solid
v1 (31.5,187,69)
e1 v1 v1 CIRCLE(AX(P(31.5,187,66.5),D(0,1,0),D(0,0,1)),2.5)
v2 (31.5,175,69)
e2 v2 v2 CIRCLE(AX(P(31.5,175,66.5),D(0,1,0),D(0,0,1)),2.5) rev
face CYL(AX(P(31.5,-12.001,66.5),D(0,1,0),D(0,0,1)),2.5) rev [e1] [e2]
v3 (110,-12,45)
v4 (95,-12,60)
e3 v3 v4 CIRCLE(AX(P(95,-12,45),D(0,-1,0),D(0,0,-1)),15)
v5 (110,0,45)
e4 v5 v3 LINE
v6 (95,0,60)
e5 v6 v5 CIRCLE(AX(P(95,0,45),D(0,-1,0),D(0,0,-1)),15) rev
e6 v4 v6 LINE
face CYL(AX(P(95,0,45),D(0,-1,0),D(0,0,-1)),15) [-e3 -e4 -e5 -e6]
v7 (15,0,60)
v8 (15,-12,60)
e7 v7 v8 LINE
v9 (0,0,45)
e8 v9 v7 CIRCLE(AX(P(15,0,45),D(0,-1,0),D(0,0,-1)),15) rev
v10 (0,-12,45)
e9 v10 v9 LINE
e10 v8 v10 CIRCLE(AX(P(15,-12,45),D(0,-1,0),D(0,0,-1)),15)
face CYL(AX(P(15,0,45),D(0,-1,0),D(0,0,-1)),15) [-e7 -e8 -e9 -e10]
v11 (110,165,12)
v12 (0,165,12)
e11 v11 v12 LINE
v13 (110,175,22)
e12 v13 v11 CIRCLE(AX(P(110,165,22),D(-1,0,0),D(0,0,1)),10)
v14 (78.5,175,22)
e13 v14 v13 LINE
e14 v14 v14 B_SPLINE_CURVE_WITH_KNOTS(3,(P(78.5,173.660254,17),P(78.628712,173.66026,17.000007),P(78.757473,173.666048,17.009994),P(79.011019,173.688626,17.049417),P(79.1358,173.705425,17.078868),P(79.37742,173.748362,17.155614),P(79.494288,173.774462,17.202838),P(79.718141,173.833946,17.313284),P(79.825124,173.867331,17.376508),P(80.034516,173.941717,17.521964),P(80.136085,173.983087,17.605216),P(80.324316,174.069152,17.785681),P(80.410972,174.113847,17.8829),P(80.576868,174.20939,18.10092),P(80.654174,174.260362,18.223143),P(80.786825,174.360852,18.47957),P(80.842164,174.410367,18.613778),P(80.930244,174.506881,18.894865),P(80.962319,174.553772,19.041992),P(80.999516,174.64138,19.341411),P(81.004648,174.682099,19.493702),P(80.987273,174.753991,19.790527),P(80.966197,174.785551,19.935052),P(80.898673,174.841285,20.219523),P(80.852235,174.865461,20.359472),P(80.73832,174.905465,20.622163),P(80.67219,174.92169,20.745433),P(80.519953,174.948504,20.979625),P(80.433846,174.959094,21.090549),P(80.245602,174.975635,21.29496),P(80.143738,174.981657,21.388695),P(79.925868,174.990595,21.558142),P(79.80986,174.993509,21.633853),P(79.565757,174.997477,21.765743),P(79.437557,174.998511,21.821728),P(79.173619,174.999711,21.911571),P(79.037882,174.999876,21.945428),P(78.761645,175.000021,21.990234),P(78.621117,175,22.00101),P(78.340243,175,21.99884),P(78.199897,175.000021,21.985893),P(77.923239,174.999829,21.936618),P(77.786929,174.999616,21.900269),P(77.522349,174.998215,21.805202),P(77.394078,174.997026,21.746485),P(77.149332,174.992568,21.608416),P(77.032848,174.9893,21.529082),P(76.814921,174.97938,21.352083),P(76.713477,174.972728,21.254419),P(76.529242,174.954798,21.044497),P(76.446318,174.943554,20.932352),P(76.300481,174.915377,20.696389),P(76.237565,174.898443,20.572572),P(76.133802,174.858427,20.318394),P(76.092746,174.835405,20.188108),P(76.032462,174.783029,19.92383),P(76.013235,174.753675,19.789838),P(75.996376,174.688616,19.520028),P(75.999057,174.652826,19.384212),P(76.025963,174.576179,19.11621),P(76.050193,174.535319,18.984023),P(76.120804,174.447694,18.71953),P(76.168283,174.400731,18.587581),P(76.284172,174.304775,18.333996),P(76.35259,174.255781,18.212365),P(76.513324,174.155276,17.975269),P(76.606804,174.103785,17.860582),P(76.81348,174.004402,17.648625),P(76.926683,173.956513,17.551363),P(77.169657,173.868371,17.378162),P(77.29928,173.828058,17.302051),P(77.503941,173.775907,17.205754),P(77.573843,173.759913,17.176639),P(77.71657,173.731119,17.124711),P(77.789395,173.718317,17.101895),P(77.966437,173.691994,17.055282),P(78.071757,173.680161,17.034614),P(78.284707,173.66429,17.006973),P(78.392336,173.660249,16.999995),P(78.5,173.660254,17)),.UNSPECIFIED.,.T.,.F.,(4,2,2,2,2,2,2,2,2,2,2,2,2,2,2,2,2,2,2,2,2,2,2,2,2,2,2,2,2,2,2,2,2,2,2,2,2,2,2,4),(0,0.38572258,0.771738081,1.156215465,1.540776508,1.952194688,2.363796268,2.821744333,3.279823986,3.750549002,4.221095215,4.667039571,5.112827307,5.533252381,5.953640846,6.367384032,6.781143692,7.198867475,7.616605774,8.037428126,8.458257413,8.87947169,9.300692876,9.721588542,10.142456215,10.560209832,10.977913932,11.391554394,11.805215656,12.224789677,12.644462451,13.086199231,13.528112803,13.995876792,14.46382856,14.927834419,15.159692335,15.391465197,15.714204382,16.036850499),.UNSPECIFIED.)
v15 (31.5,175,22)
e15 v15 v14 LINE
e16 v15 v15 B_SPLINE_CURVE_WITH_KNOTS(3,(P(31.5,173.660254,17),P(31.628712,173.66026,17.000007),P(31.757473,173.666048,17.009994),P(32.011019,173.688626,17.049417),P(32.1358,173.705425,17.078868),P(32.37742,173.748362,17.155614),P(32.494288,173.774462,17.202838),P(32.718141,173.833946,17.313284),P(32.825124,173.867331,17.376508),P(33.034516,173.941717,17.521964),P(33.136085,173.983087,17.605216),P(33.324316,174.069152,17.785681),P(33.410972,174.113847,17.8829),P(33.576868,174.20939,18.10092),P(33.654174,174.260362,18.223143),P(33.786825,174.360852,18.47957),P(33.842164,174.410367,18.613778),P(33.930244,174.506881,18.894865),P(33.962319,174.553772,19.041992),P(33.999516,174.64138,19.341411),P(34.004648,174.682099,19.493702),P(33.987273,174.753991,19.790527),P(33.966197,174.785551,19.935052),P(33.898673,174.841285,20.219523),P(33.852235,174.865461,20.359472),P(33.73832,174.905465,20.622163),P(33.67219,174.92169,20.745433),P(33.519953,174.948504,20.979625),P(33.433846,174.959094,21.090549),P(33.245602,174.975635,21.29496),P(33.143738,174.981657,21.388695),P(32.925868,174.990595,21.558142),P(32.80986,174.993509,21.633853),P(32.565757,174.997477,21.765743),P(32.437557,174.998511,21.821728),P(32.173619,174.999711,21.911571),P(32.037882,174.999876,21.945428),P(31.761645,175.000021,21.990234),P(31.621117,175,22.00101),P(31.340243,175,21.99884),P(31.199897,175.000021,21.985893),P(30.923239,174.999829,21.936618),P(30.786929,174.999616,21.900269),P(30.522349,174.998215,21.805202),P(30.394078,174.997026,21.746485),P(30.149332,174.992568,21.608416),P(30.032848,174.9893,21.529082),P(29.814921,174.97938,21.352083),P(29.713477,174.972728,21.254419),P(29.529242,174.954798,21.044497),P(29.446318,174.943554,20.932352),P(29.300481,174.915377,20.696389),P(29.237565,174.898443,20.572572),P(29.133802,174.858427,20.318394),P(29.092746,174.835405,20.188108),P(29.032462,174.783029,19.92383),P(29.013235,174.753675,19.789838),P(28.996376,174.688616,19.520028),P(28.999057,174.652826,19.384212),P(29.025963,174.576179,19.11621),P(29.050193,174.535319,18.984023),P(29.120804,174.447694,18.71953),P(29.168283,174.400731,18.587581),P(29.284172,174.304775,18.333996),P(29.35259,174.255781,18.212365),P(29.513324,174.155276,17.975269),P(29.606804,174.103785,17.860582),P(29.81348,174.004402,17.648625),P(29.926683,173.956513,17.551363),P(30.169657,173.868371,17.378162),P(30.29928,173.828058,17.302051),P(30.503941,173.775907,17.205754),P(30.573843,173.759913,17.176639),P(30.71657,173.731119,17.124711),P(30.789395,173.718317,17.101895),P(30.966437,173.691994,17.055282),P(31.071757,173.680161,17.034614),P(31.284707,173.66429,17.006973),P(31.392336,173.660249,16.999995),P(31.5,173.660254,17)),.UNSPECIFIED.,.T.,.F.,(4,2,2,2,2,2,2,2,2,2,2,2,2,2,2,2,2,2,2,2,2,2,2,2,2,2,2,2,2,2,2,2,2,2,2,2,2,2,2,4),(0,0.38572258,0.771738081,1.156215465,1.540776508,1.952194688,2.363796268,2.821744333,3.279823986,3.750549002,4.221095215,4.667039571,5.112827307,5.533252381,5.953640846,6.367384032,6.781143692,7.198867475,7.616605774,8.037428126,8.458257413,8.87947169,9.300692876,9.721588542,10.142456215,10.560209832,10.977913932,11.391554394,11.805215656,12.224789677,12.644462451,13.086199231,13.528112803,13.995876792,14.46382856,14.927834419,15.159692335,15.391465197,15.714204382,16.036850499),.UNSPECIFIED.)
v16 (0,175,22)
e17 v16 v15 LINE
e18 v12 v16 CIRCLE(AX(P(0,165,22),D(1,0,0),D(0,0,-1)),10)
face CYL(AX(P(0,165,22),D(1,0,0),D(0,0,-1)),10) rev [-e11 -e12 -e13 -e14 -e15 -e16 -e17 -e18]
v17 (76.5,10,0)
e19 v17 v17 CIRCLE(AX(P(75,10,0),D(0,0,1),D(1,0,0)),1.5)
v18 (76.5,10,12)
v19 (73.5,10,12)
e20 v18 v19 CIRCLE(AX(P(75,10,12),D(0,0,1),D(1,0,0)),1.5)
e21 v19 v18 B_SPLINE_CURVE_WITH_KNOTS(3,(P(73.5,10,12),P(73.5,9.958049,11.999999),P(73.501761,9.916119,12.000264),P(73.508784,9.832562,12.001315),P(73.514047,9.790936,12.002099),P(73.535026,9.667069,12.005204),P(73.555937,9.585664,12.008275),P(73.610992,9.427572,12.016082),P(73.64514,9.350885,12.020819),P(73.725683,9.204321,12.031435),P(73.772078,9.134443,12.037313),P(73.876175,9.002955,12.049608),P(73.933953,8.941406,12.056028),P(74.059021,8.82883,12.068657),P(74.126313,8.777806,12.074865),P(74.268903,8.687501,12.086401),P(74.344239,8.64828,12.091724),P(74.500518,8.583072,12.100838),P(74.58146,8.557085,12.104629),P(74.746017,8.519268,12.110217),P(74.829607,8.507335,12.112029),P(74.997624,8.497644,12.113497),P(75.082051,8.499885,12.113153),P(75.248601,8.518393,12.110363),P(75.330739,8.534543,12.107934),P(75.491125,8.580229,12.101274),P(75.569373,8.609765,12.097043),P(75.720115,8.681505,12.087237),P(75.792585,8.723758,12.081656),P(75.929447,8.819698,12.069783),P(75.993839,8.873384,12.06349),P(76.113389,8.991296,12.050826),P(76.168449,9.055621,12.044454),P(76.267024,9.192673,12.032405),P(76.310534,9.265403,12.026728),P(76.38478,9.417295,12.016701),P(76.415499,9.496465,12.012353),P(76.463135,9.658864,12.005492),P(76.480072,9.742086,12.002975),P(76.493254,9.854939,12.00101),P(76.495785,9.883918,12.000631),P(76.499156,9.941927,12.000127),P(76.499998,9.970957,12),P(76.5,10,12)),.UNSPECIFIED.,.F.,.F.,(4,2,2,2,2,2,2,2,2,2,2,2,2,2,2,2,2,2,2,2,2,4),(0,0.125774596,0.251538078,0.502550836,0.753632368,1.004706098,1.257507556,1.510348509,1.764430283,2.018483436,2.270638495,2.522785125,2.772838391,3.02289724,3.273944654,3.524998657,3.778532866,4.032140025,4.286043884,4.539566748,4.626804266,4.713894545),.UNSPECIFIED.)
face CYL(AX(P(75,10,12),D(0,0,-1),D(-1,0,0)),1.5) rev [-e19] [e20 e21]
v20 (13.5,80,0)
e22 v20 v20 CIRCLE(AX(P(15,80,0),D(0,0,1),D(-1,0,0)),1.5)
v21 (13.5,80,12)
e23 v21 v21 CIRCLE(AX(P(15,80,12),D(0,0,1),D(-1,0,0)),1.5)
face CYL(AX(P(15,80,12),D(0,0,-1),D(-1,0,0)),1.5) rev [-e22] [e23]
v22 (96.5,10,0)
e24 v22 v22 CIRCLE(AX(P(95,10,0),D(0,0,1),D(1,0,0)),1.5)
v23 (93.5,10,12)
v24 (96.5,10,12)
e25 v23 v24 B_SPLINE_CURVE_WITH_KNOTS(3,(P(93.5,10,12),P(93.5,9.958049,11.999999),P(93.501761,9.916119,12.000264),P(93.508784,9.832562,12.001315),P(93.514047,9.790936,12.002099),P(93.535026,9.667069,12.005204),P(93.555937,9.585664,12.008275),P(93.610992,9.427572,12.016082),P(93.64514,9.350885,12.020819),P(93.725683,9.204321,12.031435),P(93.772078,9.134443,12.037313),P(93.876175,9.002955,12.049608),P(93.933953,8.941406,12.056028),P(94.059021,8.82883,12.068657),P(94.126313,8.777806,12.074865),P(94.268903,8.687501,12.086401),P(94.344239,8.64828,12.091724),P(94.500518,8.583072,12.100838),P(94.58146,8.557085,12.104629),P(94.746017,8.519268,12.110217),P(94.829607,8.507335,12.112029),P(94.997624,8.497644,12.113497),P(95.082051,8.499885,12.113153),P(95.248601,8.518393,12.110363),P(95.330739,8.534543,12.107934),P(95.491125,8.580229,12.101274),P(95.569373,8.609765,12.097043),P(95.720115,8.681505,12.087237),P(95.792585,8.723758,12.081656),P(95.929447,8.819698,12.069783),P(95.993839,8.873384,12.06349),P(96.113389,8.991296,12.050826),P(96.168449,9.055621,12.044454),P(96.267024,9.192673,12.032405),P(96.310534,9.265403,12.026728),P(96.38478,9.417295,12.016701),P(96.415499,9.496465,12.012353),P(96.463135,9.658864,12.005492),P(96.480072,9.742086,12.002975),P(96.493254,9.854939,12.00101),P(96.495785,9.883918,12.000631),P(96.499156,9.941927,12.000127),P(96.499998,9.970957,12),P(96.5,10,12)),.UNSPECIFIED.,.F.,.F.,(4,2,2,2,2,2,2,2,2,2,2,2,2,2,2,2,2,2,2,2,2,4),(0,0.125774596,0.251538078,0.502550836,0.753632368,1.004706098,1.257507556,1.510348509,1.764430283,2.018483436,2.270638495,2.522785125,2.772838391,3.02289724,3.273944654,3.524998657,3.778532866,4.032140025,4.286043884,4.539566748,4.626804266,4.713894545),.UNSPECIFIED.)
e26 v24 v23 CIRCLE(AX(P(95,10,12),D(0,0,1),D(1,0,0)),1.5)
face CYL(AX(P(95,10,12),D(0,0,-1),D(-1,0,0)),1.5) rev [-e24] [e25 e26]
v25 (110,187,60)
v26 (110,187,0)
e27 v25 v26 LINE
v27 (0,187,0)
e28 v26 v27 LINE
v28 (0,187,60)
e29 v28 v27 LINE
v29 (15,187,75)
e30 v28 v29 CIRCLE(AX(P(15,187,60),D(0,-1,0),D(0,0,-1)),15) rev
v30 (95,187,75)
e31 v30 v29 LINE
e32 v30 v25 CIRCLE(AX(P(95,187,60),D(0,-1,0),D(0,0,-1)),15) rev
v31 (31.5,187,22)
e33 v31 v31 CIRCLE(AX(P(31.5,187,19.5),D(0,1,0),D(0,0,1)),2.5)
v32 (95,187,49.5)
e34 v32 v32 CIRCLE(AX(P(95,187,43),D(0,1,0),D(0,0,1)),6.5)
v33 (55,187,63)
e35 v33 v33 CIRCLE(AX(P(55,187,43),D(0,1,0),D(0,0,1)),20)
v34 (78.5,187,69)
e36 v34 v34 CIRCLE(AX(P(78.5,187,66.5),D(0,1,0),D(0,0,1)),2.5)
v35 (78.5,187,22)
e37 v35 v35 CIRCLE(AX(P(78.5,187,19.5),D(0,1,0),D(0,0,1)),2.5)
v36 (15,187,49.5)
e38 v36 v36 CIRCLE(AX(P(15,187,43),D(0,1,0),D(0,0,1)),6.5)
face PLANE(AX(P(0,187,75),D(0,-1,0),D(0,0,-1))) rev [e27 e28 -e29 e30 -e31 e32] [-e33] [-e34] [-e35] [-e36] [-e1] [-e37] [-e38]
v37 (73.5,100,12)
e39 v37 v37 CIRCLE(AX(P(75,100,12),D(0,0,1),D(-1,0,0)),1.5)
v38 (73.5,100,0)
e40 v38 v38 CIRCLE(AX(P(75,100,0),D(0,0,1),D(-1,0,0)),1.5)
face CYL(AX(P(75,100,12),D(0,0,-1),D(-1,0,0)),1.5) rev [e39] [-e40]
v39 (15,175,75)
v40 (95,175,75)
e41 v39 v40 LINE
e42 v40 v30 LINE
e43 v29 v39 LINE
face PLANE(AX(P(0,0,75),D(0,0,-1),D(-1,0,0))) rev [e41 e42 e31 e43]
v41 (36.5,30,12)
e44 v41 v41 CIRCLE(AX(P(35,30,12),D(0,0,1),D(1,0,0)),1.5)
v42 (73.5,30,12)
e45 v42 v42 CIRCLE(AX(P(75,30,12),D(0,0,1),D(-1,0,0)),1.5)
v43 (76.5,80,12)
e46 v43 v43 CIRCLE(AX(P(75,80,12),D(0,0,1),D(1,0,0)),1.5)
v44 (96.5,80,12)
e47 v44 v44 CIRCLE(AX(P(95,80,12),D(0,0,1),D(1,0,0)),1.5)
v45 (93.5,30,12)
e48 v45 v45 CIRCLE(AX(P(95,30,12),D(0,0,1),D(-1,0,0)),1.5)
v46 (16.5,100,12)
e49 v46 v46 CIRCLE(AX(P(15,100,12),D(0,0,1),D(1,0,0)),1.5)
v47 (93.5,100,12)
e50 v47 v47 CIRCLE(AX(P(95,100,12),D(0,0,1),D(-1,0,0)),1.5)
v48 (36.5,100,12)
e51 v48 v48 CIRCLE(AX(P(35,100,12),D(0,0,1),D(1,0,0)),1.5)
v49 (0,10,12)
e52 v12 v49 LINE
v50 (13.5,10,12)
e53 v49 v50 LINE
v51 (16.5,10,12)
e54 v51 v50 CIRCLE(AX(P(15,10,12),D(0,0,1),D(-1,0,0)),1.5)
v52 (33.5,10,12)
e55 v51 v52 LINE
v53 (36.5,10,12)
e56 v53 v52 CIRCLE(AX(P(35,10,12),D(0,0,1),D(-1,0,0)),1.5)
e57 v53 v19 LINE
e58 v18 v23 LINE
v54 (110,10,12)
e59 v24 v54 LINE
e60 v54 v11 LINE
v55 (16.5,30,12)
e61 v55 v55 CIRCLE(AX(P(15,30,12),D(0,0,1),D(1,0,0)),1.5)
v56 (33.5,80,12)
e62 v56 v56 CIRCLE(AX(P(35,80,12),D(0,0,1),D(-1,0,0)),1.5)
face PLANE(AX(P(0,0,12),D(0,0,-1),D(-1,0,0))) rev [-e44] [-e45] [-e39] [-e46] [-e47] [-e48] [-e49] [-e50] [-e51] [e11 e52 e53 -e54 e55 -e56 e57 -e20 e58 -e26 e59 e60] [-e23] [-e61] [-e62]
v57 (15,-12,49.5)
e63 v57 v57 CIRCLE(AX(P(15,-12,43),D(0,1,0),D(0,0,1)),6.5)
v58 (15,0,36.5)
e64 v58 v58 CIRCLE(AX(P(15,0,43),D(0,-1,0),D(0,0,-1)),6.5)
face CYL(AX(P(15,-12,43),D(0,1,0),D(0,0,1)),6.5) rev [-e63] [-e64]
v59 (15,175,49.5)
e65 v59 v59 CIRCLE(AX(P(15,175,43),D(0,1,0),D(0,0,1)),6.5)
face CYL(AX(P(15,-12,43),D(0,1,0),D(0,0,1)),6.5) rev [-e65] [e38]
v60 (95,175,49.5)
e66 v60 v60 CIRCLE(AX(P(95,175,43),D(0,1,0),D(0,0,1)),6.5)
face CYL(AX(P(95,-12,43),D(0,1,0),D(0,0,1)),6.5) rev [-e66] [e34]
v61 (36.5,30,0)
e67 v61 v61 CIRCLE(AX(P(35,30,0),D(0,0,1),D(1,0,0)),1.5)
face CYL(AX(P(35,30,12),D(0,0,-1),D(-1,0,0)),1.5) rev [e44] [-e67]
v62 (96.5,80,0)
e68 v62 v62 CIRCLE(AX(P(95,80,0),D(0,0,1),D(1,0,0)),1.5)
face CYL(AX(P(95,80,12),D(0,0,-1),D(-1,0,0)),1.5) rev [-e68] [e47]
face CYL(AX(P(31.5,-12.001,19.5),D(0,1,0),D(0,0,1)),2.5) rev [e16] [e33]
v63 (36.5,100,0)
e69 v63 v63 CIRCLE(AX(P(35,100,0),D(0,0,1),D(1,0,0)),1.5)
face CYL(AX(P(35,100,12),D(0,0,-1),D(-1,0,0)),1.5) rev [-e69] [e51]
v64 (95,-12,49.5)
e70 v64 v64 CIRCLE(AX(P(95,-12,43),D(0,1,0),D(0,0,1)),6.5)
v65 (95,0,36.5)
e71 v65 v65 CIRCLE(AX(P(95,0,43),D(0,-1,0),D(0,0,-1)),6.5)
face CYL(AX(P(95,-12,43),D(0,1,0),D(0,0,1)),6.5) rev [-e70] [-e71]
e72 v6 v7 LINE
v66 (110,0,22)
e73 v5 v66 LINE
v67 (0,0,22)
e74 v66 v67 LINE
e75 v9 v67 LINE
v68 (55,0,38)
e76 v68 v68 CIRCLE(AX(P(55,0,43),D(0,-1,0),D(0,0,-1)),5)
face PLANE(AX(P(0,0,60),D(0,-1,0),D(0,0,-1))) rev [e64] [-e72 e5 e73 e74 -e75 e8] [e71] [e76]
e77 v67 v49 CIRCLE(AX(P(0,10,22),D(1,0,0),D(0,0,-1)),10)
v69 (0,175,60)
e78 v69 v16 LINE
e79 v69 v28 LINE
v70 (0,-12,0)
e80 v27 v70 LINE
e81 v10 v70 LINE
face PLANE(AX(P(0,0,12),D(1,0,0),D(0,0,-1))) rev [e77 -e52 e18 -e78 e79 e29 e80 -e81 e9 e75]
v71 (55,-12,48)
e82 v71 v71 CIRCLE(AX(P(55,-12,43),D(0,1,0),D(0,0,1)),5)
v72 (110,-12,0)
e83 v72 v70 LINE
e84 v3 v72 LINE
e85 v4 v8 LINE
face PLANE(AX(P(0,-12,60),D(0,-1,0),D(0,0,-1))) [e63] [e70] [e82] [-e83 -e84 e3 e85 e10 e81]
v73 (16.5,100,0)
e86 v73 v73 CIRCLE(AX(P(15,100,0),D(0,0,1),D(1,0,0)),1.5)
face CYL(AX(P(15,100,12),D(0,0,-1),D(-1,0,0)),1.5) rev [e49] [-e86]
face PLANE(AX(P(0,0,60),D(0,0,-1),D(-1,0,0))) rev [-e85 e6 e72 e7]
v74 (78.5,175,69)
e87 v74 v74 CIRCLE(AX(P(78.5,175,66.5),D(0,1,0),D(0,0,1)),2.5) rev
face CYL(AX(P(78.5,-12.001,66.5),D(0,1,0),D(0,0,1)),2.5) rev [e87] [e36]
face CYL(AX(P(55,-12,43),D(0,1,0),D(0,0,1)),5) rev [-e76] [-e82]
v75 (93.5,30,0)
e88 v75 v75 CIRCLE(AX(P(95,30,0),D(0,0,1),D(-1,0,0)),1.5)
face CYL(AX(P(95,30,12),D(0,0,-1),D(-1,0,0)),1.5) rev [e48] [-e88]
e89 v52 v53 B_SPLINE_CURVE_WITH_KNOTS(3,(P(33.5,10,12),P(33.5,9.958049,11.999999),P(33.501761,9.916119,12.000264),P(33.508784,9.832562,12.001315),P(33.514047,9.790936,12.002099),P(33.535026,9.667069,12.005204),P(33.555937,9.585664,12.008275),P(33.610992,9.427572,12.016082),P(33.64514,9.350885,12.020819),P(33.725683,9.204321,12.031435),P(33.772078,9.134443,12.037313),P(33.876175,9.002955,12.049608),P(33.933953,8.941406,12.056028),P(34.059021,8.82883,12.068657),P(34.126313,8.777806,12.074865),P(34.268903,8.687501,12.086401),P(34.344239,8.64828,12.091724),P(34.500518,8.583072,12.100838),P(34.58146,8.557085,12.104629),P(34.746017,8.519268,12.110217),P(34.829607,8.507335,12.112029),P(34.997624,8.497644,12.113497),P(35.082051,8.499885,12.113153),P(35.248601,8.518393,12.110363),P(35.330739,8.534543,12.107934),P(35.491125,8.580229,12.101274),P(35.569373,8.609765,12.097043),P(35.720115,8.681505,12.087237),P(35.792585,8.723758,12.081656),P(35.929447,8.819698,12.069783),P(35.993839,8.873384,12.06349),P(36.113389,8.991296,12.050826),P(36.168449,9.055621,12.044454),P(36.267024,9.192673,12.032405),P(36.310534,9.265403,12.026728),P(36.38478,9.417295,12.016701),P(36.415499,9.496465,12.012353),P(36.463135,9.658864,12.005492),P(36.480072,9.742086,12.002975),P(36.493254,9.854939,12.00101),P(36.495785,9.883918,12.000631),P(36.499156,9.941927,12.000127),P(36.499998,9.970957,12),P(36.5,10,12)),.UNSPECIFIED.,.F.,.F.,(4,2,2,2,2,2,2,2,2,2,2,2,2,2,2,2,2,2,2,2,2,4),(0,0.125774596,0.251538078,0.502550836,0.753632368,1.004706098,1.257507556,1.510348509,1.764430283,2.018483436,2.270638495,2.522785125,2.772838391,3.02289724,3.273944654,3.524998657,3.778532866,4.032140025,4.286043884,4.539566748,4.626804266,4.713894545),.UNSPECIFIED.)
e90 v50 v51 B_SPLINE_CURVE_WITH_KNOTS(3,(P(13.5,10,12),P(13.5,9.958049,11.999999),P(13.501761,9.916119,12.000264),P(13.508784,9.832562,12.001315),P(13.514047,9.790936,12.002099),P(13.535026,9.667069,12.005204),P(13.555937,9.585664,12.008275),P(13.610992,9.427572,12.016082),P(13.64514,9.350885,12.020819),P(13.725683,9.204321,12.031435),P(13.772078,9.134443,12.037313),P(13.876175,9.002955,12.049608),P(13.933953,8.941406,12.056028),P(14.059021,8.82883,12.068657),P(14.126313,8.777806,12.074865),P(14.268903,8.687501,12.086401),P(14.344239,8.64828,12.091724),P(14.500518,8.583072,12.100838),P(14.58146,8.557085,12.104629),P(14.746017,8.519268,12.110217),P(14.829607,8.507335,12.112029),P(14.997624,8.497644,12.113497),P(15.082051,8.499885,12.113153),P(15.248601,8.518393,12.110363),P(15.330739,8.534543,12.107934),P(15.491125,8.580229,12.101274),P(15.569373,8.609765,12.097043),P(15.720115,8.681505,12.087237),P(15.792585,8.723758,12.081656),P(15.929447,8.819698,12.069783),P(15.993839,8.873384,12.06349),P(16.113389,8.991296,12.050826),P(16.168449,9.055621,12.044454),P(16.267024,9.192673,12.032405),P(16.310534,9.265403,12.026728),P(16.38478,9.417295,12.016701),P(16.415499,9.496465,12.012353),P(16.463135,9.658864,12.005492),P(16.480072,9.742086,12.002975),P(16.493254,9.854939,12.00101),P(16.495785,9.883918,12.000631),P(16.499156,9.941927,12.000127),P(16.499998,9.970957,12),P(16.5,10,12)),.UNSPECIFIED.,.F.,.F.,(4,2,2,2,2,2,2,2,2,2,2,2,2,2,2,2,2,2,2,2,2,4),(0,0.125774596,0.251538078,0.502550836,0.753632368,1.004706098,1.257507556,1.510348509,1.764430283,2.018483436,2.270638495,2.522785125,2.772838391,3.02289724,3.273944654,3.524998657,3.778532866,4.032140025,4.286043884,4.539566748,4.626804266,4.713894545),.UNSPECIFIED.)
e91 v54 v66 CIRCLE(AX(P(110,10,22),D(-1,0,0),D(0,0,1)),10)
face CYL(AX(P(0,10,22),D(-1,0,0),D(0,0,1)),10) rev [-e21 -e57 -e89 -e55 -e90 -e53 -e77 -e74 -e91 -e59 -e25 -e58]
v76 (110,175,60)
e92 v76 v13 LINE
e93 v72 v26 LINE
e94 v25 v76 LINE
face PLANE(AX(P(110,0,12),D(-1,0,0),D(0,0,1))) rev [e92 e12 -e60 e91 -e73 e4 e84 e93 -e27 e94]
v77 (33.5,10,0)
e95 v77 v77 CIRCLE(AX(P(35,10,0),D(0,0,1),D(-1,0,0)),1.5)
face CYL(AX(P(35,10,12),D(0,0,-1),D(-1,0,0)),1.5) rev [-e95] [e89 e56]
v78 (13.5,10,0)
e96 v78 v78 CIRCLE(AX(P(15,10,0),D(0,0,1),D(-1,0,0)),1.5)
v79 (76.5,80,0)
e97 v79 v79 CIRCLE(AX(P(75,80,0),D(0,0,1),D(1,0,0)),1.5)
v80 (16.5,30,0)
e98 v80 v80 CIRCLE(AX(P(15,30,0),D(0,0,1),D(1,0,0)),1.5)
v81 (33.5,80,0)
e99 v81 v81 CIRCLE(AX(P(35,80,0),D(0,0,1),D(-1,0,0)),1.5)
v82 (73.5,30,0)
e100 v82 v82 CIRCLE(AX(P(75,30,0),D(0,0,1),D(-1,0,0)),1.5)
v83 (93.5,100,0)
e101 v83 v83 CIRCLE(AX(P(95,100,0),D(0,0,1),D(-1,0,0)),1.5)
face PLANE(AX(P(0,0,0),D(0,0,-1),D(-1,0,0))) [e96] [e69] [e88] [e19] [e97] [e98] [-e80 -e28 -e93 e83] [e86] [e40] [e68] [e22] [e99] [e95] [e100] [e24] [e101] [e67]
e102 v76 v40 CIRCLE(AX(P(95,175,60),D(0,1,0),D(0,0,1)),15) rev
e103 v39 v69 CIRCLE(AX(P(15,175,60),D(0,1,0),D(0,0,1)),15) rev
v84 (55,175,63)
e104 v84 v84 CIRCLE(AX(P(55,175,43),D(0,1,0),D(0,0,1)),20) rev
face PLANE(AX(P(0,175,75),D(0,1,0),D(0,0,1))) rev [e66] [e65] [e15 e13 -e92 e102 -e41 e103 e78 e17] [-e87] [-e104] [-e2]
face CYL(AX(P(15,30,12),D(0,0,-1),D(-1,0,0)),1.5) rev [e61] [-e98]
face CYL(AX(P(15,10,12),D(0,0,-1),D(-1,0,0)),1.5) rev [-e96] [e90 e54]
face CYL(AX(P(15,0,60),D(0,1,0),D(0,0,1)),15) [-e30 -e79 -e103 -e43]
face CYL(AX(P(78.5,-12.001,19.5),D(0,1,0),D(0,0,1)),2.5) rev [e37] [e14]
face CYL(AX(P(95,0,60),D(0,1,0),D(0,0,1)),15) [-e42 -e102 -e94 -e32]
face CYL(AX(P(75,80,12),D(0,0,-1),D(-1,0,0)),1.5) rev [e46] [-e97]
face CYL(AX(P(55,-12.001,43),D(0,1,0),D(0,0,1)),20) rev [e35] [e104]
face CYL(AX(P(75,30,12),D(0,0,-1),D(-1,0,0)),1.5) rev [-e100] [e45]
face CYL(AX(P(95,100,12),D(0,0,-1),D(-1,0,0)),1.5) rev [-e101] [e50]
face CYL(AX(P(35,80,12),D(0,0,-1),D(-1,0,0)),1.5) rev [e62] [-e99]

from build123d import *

# Parameters (mm, degrees)
SKETCH1_W           = 110
SKETCH1_H           = 175
SKETCH1_R           = 1.5
BOSS_EXTRUDE1_DEPTH = 12
SKETCH2_W           = 110
SKETCH2_H           = 12
BOSS_EXTRUDE2_DEPTH = 75
SKETCH2_3_W         = 110
SKETCH2_3_H         = 12
BOSS_EXTRUDE3_DEPTH = 60
SKETCH3_R           = 6.5
CUT_EXTRUDE1_DEPTH  = 240.428486192
CUT_EXTRUDE2_REACH  = 241.428
SKETCH3_3_R         = 2.5
SKETCH3_3_R_2       = 20
SKETCH3_4_R         = 5
CUT_EXTRUDE3_DEPTH  = 240.428486192
FILLET1_R           = 10
FILLET2_R           = 15


with BuildPart() as part:
    # Sketch1 → Boss-Extrude1 (new body)
    with BuildSketch(Plane.XY):
        with Locations((55, 87.5)):
            Rectangle(SKETCH1_W, SKETCH1_H)
        with Locations((95, 10)):
            Circle(SKETCH1_R, mode=Mode.SUBTRACT)
        with Locations((75, 10)):
            Circle(SKETCH1_R, mode=Mode.SUBTRACT)
        with Locations(Location((95, 30, 0), (0, 0, 180))):
            Circle(SKETCH1_R, mode=Mode.SUBTRACT)
        with Locations(Location((75, 30, 0), (0, 0, 180))):
            Circle(SKETCH1_R, mode=Mode.SUBTRACT)
        with Locations(Location((35, 10, 0), (0, 0, 180))):
            Circle(SKETCH1_R, mode=Mode.SUBTRACT)
        with Locations(Location((15, 10, 0), (0, 0, 180))):
            Circle(SKETCH1_R, mode=Mode.SUBTRACT)
        with Locations((15, 30)):
            Circle(SKETCH1_R, mode=Mode.SUBTRACT)
        with Locations((35, 30)):
            Circle(SKETCH1_R, mode=Mode.SUBTRACT)
        with Locations(Location((95, 100, 0), (0, 0, 180))):
            Circle(SKETCH1_R, mode=Mode.SUBTRACT)
        with Locations((95, 80)):
            Circle(SKETCH1_R, mode=Mode.SUBTRACT)
        with Locations((75, 80)):
            Circle(SKETCH1_R, mode=Mode.SUBTRACT)
        with Locations(Location((75, 100, 0), (0, 0, 180))):
            Circle(SKETCH1_R, mode=Mode.SUBTRACT)
        with Locations((35, 100)):
            Circle(SKETCH1_R, mode=Mode.SUBTRACT)
        with Locations((15, 100)):
            Circle(SKETCH1_R, mode=Mode.SUBTRACT)
        with Locations(Location((35, 80, 0), (0, 0, 180))):
            Circle(SKETCH1_R, mode=Mode.SUBTRACT)
        with Locations(Location((15, 80, 0), (0, 0, 180))):
            Circle(SKETCH1_R, mode=Mode.SUBTRACT)
    extrude(amount=BOSS_EXTRUDE1_DEPTH)

    # Sketch2 → Boss-Extrude2 (add)
    with BuildSketch(Plane(origin=(0, 0, 0), x_dir=(-1, 0, 0), z_dir=(0, 0, -1))):
        with Locations((-55, 181)):
            Rectangle(SKETCH2_W, SKETCH2_H)
    extrude(amount=-BOSS_EXTRUDE2_DEPTH)

    # Sketch2<3> → Boss-Extrude3 (add)
    with BuildSketch(Plane(origin=(0, 0, 0), x_dir=(-1, 0, 0), z_dir=(0, 0, -1))):
        with Locations((-55, -6)):
            Rectangle(SKETCH2_3_W, SKETCH2_3_H)
    extrude(amount=-BOSS_EXTRUDE3_DEPTH)

    # Sketch3 → Cut-Extrude1 (cut, through all)
    with BuildSketch(Plane(origin=(0, 187, 0), x_dir=(1, 0, 0), z_dir=(0, 1, 0))):
        with Locations(Location((15, -43, 0), (0, 0, 270))):
            Circle(SKETCH3_R)
        with Locations(Location((95, -43, 0), (0, 0, 270))):
            Circle(SKETCH3_R)
    extrude(amount=-CUT_EXTRUDE1_DEPTH, mode=Mode.SUBTRACT)

    # Sketch3<3> → Cut-Extrude2 (cut, up to next)
    with BuildSketch(Plane(origin=(0, 187, 0), x_dir=(1, 0, 0), z_dir=(0, 1, 0)), mode=Mode.PRIVATE) as cut_extrude2_sk1:
        with Locations(Location((31.5, -19.5, 0), (0, 0, 270))):
            Circle(SKETCH3_3_R)
    cut_extrude2_tool1 = extrude(cut_extrude2_sk1.sketch, amount=-CUT_EXTRUDE2_REACH, mode=Mode.PRIVATE) & part.part
    # Sketch3<3> → Cut-Extrude2 (cut, up to next)
    with BuildSketch(Plane(origin=(0, 187, 0), x_dir=(1, 0, 0), z_dir=(0, 1, 0)), mode=Mode.PRIVATE) as cut_extrude2_sk2:
        with Locations(Location((78.5, -19.5, 0), (0, 0, 270))):
            Circle(SKETCH3_3_R)
    cut_extrude2_tool2 = extrude(cut_extrude2_sk2.sketch, amount=-CUT_EXTRUDE2_REACH, mode=Mode.PRIVATE) & part.part
    # Sketch3<3> → Cut-Extrude2 (cut, up to next)
    with BuildSketch(Plane(origin=(0, 187, 0), x_dir=(1, 0, 0), z_dir=(0, 1, 0)), mode=Mode.PRIVATE) as cut_extrude2_sk3:
        with Locations(Location((31.5, -66.5, 0), (0, 0, 270))):
            Circle(SKETCH3_3_R)
    cut_extrude2_tool3 = extrude(cut_extrude2_sk3.sketch, amount=-CUT_EXTRUDE2_REACH, mode=Mode.PRIVATE) & part.part
    # Sketch3<3> → Cut-Extrude2 (cut, up to next)
    with BuildSketch(Plane(origin=(0, 187, 0), x_dir=(1, 0, 0), z_dir=(0, 1, 0)), mode=Mode.PRIVATE) as cut_extrude2_sk4:
        with Locations(Location((78.5, -66.5, 0), (0, 0, 270))):
            Circle(SKETCH3_3_R)
    cut_extrude2_tool4 = extrude(cut_extrude2_sk4.sketch, amount=-CUT_EXTRUDE2_REACH, mode=Mode.PRIVATE) & part.part
    # Sketch3<3> → Cut-Extrude2 (cut, up to next)
    with BuildSketch(Plane(origin=(0, 187, 0), x_dir=(1, 0, 0), z_dir=(0, 1, 0)), mode=Mode.PRIVATE) as cut_extrude2_sk5:
        with Locations(Location((55, -43, 0), (0, 0, 270))):
            Circle(SKETCH3_3_R_2)
    cut_extrude2_tool5 = extrude(cut_extrude2_sk5.sketch, amount=-CUT_EXTRUDE2_REACH, mode=Mode.PRIVATE) & part.part
    add(cut_extrude2_tool1.solids().sort_by_distance((31.5, 187, 19.5))[0], mode=Mode.SUBTRACT)
    add(cut_extrude2_tool2.solids().sort_by_distance((78.5, 187, 19.5))[0], mode=Mode.SUBTRACT)
    add(cut_extrude2_tool3.solids().sort_by_distance((31.5, 187, 66.5))[0], mode=Mode.SUBTRACT)
    add(cut_extrude2_tool4.solids().sort_by_distance((78.5, 187, 66.5))[0], mode=Mode.SUBTRACT)
    add(cut_extrude2_tool5.solids().sort_by_distance((55, 187, 43))[0], mode=Mode.SUBTRACT)

    # Sketch3<4> → Cut-Extrude3 (cut, through all)
    with BuildSketch(Plane(origin=(0, 187, 0), x_dir=(1, 0, 0), z_dir=(0, 1, 0))):
        with Locations(Location((55, -43, 0), (0, 0, 270))):
            Circle(SKETCH3_4_R)
    extrude(amount=-CUT_EXTRUDE3_DEPTH, mode=Mode.SUBTRACT)

    # Fillet1
    # the kernel refuses this fillet: 10 mm, written as the material it adds along each edge
    with BuildSketch(Plane(origin=(110, 175, 12), x_dir=(0, -1, 0), z_dir=(-1, 0, 0))) as fillet1_piece_1_section:
        with BuildLine():
            CenterArc((FILLET1_R, FILLET1_R), FILLET1_R, 180, 90)
            Line((0, FILLET1_R), (-FILLET1_R * 0.02, FILLET1_R))
            Line((-FILLET1_R * 0.02, FILLET1_R), (-FILLET1_R * 0.02, -FILLET1_R * 0.02))
            Line((-FILLET1_R * 0.02, -FILLET1_R * 0.02), (FILLET1_R, -FILLET1_R * 0.02))
            Line((FILLET1_R, -FILLET1_R * 0.02), (FILLET1_R, 0))
        make_face()
    fillet1_piece_1 = extrude(amount=110, mode=Mode.PRIVATE)
    fillet1_piece_1 = fillet1_piece_1 - Plane(origin=(78.5, 172.718411152, 19.5), x_dir=(0, 0, 1), z_dir=(0, 1, 0)) * Cylinder(2.5, 260, mode=Mode.PRIVATE)
    fillet1_piece_1 = fillet1_piece_1 - Plane(origin=(31.5, 172.718411152, 19.5), x_dir=(0, 0, 1), z_dir=(0, 1, 0)) * Cylinder(2.5, 260, mode=Mode.PRIVATE)
    add(fillet1_piece_1)
    with BuildSketch(Plane(origin=(0, 0, 12), x_dir=(0, 1, 0), z_dir=(1, 0, 0))) as fillet1_piece_2_section:
        with BuildLine():
            CenterArc((FILLET1_R, FILLET1_R), FILLET1_R, 180, 90)
            Line((0, FILLET1_R), (-FILLET1_R * 0.02, FILLET1_R))
            Line((-FILLET1_R * 0.02, FILLET1_R), (-FILLET1_R * 0.02, -FILLET1_R * 0.02))
            Line((-FILLET1_R * 0.02, -FILLET1_R * 0.02), (FILLET1_R, -FILLET1_R * 0.02))
            Line((FILLET1_R, -FILLET1_R * 0.02), (FILLET1_R, 0))
        make_face()
    fillet1_piece_2 = extrude(amount=110, mode=Mode.PRIVATE)
    fillet1_piece_2 = fillet1_piece_2 - Plane(origin=(95, 10, 14.266654876), x_dir=(1, 0, 0), z_dir=(0, 0, -1)) * Cylinder(1.5, 260, mode=Mode.PRIVATE)
    fillet1_piece_2 = fillet1_piece_2 - Plane(origin=(75, 10, 14.266654876), x_dir=(1, 0, 0), z_dir=(0, 0, -1)) * Cylinder(1.5, 260, mode=Mode.PRIVATE)
    fillet1_piece_2 = fillet1_piece_2 - Plane(origin=(35, 10, 14.266654876), x_dir=(-1, 0, 0), z_dir=(0, 0, -1)) * Cylinder(1.5, 260, mode=Mode.PRIVATE)
    fillet1_piece_2 = fillet1_piece_2 - Plane(origin=(15, 10, 14.266654876), x_dir=(-1, 0, 0), z_dir=(0, 0, -1)) * Cylinder(1.5, 260, mode=Mode.PRIVATE)
    add(fillet1_piece_2)

    # Fillet2
    fillet2_edges = [part.edges().sort_by_distance(p)[0] for p in [
        (110, 181, 75),
        (0, 181, 75),
        (110, -6, 60),
        (0, -6, 60),
    ]]
    fillet(fillet2_edges, radius=FILLET2_R)


solid = part.part
